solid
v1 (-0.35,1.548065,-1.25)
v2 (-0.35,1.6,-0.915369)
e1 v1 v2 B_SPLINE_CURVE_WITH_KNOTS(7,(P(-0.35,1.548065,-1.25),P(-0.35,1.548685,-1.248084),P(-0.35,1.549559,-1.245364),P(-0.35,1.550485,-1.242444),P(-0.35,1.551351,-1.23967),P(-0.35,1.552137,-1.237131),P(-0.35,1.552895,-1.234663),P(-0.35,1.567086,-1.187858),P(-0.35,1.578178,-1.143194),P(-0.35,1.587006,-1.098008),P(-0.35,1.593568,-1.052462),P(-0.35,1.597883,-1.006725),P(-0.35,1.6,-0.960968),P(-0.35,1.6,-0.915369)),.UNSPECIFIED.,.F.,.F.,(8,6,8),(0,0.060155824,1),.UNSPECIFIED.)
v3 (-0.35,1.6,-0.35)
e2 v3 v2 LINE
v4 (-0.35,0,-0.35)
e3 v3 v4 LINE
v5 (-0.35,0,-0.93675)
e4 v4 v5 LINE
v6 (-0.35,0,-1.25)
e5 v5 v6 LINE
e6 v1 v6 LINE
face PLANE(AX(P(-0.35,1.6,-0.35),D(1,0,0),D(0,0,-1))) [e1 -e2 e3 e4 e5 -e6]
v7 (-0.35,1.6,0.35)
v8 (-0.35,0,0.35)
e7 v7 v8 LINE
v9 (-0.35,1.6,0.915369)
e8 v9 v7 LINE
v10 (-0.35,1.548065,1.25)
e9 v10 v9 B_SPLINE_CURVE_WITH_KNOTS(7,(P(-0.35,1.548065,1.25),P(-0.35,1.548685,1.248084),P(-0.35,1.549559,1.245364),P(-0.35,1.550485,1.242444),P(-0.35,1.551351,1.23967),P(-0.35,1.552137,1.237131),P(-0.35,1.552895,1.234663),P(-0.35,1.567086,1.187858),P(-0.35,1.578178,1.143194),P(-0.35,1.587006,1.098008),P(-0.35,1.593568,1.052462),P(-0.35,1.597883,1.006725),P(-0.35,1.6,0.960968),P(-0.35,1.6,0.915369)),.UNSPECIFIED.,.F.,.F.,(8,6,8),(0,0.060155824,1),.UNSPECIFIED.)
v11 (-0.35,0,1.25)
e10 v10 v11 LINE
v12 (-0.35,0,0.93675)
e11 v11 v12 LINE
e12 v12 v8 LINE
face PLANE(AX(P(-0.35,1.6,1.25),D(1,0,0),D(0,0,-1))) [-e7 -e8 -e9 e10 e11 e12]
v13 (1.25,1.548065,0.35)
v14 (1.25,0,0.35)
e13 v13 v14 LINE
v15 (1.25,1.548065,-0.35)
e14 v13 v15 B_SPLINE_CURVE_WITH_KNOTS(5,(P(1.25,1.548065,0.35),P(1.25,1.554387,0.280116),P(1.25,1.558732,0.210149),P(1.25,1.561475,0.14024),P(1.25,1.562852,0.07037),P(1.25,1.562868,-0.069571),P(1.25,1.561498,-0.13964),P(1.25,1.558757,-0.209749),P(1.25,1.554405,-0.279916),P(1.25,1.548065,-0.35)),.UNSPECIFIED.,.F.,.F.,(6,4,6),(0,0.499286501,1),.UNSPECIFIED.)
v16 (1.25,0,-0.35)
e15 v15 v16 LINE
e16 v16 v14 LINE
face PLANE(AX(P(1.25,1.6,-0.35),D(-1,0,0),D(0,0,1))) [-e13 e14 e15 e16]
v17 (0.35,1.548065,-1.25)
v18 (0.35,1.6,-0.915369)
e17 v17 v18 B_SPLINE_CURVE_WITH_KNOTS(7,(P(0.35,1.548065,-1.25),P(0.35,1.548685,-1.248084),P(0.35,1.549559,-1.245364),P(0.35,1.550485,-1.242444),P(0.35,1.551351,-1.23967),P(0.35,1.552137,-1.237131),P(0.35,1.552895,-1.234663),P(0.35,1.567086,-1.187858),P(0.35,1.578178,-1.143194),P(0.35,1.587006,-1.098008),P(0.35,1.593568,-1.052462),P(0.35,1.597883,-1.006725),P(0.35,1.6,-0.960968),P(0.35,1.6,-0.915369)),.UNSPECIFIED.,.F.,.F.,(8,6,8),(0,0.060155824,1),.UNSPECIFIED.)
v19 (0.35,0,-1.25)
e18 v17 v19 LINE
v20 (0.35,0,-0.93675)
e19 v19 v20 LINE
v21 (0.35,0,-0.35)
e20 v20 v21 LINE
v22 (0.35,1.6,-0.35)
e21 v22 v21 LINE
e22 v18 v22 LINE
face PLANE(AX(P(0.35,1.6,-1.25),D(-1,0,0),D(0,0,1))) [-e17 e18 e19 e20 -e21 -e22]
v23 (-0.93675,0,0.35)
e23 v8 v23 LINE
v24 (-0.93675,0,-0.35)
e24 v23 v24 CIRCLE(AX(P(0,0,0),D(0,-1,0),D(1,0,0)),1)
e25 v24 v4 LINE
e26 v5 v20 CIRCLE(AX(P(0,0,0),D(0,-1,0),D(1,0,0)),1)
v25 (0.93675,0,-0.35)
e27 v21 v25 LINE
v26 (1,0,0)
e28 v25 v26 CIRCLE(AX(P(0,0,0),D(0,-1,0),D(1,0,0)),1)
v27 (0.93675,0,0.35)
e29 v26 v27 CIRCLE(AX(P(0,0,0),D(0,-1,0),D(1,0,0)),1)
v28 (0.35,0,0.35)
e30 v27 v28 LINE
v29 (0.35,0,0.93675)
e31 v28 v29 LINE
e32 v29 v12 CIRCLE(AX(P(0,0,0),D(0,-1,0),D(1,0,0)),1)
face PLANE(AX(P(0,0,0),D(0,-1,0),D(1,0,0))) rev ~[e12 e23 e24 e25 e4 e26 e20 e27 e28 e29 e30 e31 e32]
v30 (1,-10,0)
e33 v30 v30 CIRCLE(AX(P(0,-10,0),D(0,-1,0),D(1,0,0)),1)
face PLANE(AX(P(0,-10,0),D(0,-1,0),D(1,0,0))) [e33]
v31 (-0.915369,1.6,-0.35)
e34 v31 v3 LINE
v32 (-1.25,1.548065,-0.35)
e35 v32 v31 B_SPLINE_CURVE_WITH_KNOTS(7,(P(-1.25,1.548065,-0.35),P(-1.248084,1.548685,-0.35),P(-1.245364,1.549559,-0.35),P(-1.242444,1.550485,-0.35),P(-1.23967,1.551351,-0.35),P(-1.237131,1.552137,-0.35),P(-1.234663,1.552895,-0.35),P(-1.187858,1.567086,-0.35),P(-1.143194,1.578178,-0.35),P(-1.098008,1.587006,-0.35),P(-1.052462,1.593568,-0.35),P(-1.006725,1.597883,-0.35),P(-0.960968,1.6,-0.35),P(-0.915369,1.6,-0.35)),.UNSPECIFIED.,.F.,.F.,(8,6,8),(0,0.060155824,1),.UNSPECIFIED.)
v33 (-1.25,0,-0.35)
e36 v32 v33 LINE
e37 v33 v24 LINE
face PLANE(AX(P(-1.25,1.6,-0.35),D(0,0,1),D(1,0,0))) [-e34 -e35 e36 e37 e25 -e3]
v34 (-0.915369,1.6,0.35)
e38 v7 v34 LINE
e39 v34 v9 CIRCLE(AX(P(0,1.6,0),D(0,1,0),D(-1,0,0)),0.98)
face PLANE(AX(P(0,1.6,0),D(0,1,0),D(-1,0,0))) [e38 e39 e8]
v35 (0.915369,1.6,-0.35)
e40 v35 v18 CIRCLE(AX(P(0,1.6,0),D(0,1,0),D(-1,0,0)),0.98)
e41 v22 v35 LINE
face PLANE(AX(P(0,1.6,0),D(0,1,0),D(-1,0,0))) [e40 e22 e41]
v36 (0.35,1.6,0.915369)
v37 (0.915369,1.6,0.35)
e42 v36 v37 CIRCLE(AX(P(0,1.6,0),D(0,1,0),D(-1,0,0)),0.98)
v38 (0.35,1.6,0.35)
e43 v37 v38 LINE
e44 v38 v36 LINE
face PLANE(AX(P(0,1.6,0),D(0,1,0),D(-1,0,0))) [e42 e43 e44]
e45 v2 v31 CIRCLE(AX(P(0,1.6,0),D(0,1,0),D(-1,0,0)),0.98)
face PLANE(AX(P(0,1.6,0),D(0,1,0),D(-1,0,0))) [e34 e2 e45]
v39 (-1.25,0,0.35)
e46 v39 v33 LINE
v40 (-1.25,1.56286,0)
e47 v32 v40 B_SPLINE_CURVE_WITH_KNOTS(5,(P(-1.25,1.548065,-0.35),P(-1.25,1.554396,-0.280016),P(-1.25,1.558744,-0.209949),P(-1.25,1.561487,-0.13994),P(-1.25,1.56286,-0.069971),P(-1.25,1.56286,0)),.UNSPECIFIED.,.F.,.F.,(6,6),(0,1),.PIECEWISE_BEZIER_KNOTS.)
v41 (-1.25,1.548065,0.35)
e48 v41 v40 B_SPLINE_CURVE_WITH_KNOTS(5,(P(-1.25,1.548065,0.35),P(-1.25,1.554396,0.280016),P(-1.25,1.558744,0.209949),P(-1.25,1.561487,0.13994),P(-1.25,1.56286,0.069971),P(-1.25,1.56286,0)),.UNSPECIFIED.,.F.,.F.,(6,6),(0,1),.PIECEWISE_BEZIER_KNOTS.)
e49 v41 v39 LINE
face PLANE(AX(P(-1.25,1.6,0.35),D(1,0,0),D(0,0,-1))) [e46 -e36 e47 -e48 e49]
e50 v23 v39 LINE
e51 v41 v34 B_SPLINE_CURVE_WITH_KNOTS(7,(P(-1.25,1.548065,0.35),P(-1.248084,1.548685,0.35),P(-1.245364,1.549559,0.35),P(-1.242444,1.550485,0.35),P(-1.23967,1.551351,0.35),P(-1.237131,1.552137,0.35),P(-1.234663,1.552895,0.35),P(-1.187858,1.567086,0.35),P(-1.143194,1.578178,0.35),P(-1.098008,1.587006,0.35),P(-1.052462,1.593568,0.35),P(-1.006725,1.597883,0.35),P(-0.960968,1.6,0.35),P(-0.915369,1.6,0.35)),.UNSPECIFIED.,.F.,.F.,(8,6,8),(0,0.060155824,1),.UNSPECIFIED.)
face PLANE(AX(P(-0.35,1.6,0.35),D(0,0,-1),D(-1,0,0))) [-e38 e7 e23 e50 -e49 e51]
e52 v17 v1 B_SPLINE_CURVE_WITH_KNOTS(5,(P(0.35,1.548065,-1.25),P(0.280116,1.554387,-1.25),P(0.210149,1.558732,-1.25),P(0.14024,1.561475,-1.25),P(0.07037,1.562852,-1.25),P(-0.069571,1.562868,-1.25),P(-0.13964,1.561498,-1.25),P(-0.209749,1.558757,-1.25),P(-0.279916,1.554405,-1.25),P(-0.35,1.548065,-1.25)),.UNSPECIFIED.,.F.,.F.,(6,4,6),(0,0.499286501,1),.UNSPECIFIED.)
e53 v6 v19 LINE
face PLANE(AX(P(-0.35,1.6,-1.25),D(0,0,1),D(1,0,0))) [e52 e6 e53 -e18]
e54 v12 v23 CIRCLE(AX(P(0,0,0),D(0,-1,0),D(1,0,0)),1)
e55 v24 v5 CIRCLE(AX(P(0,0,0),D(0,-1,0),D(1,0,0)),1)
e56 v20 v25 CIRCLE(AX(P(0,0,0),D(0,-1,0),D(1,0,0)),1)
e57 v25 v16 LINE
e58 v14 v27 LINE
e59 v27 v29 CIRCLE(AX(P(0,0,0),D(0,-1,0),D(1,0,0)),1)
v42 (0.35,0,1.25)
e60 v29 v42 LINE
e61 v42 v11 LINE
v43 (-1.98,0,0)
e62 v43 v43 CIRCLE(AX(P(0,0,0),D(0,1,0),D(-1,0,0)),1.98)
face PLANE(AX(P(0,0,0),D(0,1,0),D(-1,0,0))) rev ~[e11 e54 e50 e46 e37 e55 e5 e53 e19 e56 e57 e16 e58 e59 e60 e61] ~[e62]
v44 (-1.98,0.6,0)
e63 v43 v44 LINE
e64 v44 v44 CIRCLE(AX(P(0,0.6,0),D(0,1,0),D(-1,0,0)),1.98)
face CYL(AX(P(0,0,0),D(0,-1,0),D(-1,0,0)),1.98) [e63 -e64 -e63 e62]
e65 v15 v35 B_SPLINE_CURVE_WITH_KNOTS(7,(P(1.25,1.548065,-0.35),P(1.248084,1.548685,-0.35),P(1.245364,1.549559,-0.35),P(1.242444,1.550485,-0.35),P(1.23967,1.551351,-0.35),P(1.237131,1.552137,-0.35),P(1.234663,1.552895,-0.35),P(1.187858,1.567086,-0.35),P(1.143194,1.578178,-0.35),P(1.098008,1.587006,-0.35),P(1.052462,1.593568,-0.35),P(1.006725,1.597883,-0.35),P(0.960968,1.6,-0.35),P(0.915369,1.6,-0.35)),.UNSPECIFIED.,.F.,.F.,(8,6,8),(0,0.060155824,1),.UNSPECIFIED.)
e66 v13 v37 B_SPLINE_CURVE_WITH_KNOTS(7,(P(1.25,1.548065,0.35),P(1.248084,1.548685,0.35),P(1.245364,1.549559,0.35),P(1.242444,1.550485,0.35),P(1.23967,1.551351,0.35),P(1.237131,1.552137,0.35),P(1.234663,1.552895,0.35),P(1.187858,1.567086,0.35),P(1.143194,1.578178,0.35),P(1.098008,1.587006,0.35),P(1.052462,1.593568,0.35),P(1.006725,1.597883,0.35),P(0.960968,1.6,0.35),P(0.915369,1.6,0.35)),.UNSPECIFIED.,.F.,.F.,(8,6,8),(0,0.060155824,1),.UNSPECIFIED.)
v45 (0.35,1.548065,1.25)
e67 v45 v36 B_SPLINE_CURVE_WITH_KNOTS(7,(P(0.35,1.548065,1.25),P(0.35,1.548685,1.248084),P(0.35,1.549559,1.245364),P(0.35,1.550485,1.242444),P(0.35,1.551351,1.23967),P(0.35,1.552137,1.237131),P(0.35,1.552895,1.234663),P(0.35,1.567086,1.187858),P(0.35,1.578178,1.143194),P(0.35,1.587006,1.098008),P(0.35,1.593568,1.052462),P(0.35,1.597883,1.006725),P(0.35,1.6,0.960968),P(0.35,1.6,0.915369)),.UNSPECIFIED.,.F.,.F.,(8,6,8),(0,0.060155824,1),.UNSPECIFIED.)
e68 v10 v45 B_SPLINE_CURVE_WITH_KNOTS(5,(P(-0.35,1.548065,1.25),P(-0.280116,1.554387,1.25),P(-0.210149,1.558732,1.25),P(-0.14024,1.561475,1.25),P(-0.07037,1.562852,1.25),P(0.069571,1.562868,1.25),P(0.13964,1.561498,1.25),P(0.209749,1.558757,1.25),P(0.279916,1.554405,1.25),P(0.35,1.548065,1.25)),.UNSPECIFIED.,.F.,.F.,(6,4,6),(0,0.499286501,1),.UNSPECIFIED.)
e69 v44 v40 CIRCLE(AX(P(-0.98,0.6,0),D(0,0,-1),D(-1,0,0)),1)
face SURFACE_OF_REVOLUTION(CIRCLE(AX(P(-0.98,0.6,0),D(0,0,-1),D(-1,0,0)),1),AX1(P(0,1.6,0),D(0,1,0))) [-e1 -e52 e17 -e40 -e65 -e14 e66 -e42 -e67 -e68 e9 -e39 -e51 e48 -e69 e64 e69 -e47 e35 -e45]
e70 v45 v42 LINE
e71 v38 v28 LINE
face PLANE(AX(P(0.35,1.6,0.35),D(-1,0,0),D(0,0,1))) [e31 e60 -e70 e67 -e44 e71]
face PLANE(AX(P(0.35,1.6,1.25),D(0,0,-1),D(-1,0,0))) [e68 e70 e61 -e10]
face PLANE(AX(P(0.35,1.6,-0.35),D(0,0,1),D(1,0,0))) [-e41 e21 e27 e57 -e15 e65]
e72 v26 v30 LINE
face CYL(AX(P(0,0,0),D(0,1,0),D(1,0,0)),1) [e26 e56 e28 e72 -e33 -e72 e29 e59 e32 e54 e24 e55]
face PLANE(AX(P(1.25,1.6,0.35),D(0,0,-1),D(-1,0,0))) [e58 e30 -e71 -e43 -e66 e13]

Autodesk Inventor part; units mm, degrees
ref_plane "YZ Plane" through (0, 0, 0) normal (1, 0, 0) x (0, 1, 0)
ref_plane "XZ Plane" through (0, 0, 0) normal (0, 1, 0) x (-1, 0, 0)
ref_plane "XY Plane" through (0, 0, 0) normal (0, 0, 1) x (1, 0, 0)
sketch "Sketch1" plane through (0, 0, 0) normal (0, 1, 0) x (-1, 0, 0)
  circle A0 centre (0, 0) radius 1.98
  dimension "d0" = 3.96
extrude "Extrusion1" add sketch "Sketch1" along normal blind 1.6
sketch "Sketch2" plane through (0, 1.6, 0) normal (0, 1, 0) x (1, 0, 0)
  line L0 (-0.35, -0.35) -> (-1.25, -0.35)
  line L1 (-1.25, -0.35) -> (-1.25, 0.35)
  line L2 (-1.25, 0.35) -> (-0.35, 0.35)
  line L3 (-0.35, 0.35) -> (-0.35, 1.25)
  line L4 (-0.35, 1.25) -> (0.35, 1.25)
  line L5 (0.35, 1.25) -> (0.35, 0.35)
  line L6 (0.35, 0.35) -> (1.25, 0.35)
  line L7 (1.25, 0.35) -> (1.25, -0.35)
  line L8 (1.25, -0.35) -> (0.35, -0.35)
  line L9 (0.35, -1.25) -> (-0.35, -1.25)
  line L10 (-0.35, -1.25) -> (-0.35, -0.35)
  line L11 (0.35, -0.35) -> (0.35, -1.25)
  point P0 (0, 0)
  point P1 (0, -1.25)
  point P2 (0, 1.25)
  point P3 (-1.25, 0)
  point P4 (1.25, 0)
  dimension "d3" = 2.5
  dimension "d4" = 2.5
  dimension "d5" = 1.25
  dimension "d6" = 1.25
  dimension "d7" = 0.7
  dimension "d8" = 0.7
extrude "Extrusion2" cut sketch "Sketch2" against normal blind 2
fillet "Fillet1" radius 1 1 edges at (1.98, 1.6, 0)
sketch "Sketch3" plane through (0, 0, 0) normal (0, -1, 0) x (1, 0, 0)
  circle A0 centre (0, 0) radius 1
  dimension "d12" = 2
extrude "Extrusion3" add sketch "Sketch3" along normal blind 10
thread "Thread1" size "M2x0.4" class "6g" standard "ANSI Metric M Profile" full length
equation "\"d4\" = d3"
equation "\"d5\" = 0.5 * d4"
equation "\"d6\" = d5"
equation "\"d8\" = d7"
equation "\"d13\" = length"
equation "\"length\" = 10"
properties part number "M4_8mm" material "Stainless Steel"
